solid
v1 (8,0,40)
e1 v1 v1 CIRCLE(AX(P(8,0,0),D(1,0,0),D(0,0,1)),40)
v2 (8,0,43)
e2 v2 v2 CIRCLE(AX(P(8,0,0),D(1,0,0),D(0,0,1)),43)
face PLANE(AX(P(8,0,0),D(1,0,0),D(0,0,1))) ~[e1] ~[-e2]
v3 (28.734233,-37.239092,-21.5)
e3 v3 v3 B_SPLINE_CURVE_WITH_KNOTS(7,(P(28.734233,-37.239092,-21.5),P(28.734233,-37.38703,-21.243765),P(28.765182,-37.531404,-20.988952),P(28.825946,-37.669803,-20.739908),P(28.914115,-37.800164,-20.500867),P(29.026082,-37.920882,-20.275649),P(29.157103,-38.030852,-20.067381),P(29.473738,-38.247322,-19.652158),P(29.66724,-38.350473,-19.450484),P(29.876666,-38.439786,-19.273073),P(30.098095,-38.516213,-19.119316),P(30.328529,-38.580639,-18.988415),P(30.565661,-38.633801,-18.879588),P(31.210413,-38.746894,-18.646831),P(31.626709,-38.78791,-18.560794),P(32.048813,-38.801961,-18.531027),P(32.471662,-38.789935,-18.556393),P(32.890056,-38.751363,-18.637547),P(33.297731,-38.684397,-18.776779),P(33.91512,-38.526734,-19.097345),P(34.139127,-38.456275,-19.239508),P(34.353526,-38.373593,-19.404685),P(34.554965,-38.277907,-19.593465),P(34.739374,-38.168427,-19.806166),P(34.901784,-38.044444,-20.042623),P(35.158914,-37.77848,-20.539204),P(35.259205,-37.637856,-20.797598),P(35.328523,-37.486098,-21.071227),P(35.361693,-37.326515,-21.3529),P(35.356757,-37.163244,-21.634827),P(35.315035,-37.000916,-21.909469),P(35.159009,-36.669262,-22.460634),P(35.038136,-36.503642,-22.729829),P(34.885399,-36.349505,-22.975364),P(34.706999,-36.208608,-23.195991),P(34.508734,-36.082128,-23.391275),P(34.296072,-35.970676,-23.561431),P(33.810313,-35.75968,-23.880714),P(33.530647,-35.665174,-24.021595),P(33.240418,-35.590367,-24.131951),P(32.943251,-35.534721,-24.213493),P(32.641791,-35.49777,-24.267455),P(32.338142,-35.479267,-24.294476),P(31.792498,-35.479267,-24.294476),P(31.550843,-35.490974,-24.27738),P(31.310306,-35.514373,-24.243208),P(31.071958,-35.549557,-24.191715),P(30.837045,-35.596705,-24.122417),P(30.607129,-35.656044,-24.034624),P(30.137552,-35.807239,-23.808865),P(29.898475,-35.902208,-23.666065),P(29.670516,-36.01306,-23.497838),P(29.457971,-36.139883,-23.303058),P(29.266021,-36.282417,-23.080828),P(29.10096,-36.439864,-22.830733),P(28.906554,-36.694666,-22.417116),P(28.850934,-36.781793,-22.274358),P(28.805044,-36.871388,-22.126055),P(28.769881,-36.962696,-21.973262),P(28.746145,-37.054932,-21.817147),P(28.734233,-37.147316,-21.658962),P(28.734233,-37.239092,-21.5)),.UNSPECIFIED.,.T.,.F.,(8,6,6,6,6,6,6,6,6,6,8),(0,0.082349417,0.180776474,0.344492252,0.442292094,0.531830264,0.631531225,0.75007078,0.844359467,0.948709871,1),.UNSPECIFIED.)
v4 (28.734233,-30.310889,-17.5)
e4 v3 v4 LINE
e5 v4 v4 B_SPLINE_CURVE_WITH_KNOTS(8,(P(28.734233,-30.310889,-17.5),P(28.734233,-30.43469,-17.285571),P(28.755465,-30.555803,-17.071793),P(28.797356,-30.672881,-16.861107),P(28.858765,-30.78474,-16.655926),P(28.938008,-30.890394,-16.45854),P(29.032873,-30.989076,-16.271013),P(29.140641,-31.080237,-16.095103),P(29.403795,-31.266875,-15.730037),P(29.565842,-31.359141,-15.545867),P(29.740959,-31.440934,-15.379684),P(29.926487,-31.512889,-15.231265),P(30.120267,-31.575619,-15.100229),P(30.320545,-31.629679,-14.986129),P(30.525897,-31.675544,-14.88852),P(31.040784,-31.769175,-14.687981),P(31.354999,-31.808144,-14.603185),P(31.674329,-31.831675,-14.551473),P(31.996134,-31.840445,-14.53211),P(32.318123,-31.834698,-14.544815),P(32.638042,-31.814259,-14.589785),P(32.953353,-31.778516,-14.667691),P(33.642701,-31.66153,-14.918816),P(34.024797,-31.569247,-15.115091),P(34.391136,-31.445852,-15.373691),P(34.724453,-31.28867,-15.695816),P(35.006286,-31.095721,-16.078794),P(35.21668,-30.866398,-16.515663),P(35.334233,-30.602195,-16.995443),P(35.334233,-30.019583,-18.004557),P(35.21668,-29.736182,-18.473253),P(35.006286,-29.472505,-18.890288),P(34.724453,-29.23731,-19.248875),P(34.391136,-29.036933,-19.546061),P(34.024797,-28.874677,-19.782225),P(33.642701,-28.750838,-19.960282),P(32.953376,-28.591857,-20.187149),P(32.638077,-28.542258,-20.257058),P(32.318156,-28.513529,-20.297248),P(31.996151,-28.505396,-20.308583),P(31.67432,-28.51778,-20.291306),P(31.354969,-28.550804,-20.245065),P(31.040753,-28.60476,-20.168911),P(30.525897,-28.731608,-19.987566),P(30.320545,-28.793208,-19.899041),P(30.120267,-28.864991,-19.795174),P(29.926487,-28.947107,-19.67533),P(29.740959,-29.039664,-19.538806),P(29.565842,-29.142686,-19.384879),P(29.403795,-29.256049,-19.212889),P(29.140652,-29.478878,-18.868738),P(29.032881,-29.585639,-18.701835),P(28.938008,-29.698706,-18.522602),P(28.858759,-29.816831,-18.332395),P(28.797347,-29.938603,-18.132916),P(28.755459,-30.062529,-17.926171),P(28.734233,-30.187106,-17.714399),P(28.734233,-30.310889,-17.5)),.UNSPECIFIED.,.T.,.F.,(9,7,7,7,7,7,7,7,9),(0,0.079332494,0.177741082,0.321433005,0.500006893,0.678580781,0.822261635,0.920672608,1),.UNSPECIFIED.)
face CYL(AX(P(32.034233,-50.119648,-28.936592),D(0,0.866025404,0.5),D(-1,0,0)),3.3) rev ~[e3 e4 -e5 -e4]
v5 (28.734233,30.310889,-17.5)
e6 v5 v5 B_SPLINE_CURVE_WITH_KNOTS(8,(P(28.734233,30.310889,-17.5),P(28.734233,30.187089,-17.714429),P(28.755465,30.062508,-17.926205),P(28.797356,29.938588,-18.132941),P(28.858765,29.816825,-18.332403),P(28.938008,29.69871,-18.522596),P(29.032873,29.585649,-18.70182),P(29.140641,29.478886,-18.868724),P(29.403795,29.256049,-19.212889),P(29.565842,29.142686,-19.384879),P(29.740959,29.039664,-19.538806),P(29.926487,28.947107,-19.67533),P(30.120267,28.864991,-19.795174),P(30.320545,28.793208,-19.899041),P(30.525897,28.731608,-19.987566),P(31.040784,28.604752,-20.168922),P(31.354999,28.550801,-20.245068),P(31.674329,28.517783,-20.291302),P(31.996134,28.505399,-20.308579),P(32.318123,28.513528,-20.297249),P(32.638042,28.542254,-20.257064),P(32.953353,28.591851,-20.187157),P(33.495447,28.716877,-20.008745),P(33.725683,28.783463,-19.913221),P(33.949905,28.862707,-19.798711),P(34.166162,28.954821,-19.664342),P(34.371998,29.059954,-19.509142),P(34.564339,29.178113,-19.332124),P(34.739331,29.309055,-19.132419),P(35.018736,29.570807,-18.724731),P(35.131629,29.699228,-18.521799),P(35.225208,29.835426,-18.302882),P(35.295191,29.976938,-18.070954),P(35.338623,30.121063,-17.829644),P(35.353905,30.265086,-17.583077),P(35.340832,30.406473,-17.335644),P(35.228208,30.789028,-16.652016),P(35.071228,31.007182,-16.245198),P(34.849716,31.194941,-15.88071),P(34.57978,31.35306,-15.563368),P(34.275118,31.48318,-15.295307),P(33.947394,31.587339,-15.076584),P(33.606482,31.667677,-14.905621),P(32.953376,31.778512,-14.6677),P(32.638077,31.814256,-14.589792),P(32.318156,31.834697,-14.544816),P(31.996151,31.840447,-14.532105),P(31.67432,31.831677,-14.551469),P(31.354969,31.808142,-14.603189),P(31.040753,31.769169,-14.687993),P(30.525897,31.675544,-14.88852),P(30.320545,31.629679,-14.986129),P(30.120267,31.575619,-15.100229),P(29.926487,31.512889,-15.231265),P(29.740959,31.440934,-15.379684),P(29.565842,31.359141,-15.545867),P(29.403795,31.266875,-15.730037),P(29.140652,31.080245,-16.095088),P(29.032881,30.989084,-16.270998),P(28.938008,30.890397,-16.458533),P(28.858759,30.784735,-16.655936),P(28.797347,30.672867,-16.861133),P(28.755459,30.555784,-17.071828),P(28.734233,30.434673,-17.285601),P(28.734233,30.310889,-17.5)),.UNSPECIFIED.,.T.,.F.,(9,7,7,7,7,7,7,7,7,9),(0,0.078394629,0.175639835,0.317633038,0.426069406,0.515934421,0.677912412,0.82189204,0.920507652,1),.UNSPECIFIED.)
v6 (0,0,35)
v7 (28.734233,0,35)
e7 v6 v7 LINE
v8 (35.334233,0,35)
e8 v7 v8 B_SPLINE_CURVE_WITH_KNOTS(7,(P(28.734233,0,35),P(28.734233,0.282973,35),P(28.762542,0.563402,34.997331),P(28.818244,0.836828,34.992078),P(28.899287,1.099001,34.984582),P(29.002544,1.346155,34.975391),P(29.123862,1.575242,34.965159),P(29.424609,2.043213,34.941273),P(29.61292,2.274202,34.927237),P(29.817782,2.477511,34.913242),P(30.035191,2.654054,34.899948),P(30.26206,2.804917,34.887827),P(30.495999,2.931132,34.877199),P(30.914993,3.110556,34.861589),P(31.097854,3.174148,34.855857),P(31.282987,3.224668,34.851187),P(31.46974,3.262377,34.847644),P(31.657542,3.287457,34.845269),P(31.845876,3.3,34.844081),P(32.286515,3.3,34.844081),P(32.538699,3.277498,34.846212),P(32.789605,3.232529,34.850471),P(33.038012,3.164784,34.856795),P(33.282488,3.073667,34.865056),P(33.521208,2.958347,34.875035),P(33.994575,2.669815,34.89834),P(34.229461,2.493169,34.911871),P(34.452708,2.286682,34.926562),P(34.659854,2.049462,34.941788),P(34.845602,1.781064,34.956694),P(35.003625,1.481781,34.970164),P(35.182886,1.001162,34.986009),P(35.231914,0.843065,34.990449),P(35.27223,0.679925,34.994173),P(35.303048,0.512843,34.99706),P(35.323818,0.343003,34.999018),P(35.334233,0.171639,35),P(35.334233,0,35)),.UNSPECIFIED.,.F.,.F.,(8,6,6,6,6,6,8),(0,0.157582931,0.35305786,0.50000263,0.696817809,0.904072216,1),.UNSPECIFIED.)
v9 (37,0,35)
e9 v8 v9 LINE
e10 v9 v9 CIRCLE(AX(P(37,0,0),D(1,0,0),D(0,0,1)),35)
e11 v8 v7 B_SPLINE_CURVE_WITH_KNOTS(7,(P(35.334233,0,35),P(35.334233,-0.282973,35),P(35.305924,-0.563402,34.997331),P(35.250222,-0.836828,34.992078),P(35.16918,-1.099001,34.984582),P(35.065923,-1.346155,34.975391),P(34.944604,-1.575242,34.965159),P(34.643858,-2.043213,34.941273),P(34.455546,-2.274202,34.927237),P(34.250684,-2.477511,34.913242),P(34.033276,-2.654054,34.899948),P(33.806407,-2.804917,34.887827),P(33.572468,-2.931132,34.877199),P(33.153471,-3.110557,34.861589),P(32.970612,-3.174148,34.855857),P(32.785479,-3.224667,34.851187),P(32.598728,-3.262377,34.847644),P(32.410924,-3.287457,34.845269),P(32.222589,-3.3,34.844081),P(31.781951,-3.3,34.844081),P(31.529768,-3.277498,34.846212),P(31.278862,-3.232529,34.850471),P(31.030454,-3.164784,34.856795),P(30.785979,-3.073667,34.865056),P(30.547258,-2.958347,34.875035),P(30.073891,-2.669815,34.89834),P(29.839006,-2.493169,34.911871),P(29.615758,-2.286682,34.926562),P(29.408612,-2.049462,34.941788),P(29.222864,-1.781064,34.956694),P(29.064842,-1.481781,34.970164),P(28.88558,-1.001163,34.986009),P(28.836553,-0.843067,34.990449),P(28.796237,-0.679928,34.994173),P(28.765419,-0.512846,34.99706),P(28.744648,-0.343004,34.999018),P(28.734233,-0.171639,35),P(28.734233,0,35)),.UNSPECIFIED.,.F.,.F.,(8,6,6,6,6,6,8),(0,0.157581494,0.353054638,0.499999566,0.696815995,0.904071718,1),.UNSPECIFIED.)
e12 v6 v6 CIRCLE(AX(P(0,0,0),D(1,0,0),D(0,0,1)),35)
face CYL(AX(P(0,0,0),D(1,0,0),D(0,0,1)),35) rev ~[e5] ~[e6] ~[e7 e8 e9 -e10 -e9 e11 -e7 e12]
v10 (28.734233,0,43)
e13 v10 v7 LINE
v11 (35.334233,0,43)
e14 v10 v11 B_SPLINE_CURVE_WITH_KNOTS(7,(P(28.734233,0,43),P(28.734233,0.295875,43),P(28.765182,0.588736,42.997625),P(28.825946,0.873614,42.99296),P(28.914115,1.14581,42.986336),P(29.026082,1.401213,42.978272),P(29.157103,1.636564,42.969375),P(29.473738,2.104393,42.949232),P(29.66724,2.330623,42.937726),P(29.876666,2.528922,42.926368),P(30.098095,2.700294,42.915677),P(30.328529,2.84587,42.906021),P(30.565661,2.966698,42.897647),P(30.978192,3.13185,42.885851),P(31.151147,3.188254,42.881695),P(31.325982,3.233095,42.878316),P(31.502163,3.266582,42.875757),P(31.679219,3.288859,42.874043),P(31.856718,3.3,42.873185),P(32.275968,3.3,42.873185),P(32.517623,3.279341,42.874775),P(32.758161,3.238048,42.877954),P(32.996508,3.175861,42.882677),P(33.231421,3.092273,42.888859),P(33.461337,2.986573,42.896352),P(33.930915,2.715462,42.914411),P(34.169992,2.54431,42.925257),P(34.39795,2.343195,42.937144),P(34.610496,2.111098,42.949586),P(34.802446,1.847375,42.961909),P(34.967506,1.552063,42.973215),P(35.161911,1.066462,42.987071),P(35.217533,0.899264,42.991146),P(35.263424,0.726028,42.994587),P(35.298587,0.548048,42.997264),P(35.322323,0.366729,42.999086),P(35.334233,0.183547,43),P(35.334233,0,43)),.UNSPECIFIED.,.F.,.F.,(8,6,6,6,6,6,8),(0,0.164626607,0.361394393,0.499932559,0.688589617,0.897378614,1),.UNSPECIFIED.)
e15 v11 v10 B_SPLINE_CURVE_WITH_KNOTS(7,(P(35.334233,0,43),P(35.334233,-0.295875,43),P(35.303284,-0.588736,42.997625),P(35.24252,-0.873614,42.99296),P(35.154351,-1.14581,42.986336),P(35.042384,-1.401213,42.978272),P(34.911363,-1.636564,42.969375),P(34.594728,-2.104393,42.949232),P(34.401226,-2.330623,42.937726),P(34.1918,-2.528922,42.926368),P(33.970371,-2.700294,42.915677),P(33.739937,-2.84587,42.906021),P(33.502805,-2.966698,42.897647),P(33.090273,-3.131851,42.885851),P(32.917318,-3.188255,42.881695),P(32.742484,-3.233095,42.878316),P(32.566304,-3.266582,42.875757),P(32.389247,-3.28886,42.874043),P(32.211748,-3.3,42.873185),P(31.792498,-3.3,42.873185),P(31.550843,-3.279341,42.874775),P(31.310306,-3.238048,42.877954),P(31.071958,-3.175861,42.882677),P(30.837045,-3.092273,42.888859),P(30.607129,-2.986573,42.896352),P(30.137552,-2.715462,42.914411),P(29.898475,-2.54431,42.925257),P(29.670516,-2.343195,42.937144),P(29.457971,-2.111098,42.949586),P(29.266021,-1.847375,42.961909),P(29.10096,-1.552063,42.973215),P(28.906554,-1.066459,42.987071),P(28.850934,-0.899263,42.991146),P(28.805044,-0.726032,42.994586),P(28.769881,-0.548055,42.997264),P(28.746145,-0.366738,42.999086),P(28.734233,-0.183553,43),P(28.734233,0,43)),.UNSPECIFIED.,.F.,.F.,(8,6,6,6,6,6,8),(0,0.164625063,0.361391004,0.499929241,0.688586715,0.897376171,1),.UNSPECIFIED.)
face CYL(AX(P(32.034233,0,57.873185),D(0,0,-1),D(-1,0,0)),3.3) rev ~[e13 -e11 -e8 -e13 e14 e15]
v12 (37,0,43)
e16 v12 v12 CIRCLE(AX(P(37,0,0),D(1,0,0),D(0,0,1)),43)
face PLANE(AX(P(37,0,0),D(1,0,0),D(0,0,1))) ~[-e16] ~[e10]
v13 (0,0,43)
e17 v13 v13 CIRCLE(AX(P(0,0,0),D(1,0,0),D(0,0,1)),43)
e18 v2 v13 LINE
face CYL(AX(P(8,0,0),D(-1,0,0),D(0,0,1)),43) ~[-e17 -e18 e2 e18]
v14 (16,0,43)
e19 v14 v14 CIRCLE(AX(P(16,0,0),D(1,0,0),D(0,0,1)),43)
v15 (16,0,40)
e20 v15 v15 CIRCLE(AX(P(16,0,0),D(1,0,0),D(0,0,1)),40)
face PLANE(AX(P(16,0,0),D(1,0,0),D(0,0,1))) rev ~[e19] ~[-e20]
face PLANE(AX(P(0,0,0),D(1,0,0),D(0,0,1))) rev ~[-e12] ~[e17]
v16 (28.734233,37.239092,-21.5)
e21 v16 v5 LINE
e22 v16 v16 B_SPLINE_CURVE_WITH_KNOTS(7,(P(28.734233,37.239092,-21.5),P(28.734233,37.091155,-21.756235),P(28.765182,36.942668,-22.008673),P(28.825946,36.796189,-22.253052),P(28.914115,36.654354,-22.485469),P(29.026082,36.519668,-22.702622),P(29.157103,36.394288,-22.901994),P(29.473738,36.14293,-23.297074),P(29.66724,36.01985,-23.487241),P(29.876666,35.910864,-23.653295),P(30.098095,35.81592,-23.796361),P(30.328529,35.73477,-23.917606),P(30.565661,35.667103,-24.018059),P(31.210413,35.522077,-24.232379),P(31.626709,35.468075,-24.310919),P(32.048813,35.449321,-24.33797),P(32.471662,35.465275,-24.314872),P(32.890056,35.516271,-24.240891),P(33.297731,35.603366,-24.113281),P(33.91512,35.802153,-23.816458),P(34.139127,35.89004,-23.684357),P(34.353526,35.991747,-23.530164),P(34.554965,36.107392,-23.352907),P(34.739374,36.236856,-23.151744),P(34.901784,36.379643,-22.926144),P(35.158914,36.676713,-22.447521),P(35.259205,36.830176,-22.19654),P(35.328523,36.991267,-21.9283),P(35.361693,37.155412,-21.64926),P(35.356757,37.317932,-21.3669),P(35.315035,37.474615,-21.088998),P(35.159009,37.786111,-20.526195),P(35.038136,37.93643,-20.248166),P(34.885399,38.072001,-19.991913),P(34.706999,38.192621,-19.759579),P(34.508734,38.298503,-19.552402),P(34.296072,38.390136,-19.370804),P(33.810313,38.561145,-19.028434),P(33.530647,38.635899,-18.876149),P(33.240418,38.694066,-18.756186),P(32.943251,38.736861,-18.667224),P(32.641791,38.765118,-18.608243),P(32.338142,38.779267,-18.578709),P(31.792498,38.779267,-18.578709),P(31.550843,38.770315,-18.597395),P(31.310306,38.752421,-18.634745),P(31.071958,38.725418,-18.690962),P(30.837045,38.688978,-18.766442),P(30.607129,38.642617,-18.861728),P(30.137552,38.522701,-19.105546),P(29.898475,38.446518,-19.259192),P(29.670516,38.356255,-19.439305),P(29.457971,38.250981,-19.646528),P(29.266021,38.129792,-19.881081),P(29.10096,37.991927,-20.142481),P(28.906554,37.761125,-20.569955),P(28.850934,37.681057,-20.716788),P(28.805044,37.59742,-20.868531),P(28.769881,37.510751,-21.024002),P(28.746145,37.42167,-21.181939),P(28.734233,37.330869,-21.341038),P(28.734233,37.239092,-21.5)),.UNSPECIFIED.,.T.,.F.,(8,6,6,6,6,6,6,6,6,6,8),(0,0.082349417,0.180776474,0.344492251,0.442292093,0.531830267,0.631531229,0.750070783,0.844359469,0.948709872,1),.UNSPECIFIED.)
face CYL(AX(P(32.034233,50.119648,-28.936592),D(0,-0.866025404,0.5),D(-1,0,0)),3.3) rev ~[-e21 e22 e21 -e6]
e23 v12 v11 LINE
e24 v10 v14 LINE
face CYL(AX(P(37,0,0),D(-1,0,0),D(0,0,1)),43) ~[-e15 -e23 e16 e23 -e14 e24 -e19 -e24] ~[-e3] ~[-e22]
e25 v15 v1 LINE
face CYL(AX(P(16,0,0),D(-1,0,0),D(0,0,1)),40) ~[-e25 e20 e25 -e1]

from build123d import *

# Parameters (mm, degrees)
F5_D            = 6.6
F5_DEPTH        = 15
F5_START        = 0.126815
F5_TIP          = 1.9828400428
F5_COPIES_COUNT = 3


# Not quite as in the source:
# - a pattern or mirror of a feature is missing from the dataset's text; its kind, count and spacing are read off the source's solid


with BuildPart() as f1:
    # F0 (on Front) → F1 (revolve)
    with BuildSketch(Plane.XZ):
        Polygon((0, 43), (0, 35), (37, 35), (37, 43), (16, 43), (16, 40), (8, 40), (8, 43), align=None)
    revolve(axis=Axis((12.3033272102, 0, 0), (1, 0, 0)))

    # F5
    # its depths count from where the whole tool has entered the part; down to there all is cleared
    with Locations(Plane.XY.offset(43).offset(-F5_START)):
        with Locations((32.0342332125, 0)):
            f5 = Hole(F5_D / 2, depth=F5_DEPTH)
            with Locations((0, 0, -(F5_DEPTH + F5_TIP / 2))):  # 118° drill point
                Cone(0, F5_D / 2, F5_TIP, mode=Mode.SUBTRACT)

    # F5_copies: F5 ×3 about axis
    f5_copies_axis = Axis((0, 0, 0), (1, 0, 0))
    for i in range(1, F5_COPIES_COUNT):
        add(f5.rotate(f5_copies_axis, i * 360 / F5_COPIES_COUNT), mode=Mode.SUBTRACT)


solid = f1.part
